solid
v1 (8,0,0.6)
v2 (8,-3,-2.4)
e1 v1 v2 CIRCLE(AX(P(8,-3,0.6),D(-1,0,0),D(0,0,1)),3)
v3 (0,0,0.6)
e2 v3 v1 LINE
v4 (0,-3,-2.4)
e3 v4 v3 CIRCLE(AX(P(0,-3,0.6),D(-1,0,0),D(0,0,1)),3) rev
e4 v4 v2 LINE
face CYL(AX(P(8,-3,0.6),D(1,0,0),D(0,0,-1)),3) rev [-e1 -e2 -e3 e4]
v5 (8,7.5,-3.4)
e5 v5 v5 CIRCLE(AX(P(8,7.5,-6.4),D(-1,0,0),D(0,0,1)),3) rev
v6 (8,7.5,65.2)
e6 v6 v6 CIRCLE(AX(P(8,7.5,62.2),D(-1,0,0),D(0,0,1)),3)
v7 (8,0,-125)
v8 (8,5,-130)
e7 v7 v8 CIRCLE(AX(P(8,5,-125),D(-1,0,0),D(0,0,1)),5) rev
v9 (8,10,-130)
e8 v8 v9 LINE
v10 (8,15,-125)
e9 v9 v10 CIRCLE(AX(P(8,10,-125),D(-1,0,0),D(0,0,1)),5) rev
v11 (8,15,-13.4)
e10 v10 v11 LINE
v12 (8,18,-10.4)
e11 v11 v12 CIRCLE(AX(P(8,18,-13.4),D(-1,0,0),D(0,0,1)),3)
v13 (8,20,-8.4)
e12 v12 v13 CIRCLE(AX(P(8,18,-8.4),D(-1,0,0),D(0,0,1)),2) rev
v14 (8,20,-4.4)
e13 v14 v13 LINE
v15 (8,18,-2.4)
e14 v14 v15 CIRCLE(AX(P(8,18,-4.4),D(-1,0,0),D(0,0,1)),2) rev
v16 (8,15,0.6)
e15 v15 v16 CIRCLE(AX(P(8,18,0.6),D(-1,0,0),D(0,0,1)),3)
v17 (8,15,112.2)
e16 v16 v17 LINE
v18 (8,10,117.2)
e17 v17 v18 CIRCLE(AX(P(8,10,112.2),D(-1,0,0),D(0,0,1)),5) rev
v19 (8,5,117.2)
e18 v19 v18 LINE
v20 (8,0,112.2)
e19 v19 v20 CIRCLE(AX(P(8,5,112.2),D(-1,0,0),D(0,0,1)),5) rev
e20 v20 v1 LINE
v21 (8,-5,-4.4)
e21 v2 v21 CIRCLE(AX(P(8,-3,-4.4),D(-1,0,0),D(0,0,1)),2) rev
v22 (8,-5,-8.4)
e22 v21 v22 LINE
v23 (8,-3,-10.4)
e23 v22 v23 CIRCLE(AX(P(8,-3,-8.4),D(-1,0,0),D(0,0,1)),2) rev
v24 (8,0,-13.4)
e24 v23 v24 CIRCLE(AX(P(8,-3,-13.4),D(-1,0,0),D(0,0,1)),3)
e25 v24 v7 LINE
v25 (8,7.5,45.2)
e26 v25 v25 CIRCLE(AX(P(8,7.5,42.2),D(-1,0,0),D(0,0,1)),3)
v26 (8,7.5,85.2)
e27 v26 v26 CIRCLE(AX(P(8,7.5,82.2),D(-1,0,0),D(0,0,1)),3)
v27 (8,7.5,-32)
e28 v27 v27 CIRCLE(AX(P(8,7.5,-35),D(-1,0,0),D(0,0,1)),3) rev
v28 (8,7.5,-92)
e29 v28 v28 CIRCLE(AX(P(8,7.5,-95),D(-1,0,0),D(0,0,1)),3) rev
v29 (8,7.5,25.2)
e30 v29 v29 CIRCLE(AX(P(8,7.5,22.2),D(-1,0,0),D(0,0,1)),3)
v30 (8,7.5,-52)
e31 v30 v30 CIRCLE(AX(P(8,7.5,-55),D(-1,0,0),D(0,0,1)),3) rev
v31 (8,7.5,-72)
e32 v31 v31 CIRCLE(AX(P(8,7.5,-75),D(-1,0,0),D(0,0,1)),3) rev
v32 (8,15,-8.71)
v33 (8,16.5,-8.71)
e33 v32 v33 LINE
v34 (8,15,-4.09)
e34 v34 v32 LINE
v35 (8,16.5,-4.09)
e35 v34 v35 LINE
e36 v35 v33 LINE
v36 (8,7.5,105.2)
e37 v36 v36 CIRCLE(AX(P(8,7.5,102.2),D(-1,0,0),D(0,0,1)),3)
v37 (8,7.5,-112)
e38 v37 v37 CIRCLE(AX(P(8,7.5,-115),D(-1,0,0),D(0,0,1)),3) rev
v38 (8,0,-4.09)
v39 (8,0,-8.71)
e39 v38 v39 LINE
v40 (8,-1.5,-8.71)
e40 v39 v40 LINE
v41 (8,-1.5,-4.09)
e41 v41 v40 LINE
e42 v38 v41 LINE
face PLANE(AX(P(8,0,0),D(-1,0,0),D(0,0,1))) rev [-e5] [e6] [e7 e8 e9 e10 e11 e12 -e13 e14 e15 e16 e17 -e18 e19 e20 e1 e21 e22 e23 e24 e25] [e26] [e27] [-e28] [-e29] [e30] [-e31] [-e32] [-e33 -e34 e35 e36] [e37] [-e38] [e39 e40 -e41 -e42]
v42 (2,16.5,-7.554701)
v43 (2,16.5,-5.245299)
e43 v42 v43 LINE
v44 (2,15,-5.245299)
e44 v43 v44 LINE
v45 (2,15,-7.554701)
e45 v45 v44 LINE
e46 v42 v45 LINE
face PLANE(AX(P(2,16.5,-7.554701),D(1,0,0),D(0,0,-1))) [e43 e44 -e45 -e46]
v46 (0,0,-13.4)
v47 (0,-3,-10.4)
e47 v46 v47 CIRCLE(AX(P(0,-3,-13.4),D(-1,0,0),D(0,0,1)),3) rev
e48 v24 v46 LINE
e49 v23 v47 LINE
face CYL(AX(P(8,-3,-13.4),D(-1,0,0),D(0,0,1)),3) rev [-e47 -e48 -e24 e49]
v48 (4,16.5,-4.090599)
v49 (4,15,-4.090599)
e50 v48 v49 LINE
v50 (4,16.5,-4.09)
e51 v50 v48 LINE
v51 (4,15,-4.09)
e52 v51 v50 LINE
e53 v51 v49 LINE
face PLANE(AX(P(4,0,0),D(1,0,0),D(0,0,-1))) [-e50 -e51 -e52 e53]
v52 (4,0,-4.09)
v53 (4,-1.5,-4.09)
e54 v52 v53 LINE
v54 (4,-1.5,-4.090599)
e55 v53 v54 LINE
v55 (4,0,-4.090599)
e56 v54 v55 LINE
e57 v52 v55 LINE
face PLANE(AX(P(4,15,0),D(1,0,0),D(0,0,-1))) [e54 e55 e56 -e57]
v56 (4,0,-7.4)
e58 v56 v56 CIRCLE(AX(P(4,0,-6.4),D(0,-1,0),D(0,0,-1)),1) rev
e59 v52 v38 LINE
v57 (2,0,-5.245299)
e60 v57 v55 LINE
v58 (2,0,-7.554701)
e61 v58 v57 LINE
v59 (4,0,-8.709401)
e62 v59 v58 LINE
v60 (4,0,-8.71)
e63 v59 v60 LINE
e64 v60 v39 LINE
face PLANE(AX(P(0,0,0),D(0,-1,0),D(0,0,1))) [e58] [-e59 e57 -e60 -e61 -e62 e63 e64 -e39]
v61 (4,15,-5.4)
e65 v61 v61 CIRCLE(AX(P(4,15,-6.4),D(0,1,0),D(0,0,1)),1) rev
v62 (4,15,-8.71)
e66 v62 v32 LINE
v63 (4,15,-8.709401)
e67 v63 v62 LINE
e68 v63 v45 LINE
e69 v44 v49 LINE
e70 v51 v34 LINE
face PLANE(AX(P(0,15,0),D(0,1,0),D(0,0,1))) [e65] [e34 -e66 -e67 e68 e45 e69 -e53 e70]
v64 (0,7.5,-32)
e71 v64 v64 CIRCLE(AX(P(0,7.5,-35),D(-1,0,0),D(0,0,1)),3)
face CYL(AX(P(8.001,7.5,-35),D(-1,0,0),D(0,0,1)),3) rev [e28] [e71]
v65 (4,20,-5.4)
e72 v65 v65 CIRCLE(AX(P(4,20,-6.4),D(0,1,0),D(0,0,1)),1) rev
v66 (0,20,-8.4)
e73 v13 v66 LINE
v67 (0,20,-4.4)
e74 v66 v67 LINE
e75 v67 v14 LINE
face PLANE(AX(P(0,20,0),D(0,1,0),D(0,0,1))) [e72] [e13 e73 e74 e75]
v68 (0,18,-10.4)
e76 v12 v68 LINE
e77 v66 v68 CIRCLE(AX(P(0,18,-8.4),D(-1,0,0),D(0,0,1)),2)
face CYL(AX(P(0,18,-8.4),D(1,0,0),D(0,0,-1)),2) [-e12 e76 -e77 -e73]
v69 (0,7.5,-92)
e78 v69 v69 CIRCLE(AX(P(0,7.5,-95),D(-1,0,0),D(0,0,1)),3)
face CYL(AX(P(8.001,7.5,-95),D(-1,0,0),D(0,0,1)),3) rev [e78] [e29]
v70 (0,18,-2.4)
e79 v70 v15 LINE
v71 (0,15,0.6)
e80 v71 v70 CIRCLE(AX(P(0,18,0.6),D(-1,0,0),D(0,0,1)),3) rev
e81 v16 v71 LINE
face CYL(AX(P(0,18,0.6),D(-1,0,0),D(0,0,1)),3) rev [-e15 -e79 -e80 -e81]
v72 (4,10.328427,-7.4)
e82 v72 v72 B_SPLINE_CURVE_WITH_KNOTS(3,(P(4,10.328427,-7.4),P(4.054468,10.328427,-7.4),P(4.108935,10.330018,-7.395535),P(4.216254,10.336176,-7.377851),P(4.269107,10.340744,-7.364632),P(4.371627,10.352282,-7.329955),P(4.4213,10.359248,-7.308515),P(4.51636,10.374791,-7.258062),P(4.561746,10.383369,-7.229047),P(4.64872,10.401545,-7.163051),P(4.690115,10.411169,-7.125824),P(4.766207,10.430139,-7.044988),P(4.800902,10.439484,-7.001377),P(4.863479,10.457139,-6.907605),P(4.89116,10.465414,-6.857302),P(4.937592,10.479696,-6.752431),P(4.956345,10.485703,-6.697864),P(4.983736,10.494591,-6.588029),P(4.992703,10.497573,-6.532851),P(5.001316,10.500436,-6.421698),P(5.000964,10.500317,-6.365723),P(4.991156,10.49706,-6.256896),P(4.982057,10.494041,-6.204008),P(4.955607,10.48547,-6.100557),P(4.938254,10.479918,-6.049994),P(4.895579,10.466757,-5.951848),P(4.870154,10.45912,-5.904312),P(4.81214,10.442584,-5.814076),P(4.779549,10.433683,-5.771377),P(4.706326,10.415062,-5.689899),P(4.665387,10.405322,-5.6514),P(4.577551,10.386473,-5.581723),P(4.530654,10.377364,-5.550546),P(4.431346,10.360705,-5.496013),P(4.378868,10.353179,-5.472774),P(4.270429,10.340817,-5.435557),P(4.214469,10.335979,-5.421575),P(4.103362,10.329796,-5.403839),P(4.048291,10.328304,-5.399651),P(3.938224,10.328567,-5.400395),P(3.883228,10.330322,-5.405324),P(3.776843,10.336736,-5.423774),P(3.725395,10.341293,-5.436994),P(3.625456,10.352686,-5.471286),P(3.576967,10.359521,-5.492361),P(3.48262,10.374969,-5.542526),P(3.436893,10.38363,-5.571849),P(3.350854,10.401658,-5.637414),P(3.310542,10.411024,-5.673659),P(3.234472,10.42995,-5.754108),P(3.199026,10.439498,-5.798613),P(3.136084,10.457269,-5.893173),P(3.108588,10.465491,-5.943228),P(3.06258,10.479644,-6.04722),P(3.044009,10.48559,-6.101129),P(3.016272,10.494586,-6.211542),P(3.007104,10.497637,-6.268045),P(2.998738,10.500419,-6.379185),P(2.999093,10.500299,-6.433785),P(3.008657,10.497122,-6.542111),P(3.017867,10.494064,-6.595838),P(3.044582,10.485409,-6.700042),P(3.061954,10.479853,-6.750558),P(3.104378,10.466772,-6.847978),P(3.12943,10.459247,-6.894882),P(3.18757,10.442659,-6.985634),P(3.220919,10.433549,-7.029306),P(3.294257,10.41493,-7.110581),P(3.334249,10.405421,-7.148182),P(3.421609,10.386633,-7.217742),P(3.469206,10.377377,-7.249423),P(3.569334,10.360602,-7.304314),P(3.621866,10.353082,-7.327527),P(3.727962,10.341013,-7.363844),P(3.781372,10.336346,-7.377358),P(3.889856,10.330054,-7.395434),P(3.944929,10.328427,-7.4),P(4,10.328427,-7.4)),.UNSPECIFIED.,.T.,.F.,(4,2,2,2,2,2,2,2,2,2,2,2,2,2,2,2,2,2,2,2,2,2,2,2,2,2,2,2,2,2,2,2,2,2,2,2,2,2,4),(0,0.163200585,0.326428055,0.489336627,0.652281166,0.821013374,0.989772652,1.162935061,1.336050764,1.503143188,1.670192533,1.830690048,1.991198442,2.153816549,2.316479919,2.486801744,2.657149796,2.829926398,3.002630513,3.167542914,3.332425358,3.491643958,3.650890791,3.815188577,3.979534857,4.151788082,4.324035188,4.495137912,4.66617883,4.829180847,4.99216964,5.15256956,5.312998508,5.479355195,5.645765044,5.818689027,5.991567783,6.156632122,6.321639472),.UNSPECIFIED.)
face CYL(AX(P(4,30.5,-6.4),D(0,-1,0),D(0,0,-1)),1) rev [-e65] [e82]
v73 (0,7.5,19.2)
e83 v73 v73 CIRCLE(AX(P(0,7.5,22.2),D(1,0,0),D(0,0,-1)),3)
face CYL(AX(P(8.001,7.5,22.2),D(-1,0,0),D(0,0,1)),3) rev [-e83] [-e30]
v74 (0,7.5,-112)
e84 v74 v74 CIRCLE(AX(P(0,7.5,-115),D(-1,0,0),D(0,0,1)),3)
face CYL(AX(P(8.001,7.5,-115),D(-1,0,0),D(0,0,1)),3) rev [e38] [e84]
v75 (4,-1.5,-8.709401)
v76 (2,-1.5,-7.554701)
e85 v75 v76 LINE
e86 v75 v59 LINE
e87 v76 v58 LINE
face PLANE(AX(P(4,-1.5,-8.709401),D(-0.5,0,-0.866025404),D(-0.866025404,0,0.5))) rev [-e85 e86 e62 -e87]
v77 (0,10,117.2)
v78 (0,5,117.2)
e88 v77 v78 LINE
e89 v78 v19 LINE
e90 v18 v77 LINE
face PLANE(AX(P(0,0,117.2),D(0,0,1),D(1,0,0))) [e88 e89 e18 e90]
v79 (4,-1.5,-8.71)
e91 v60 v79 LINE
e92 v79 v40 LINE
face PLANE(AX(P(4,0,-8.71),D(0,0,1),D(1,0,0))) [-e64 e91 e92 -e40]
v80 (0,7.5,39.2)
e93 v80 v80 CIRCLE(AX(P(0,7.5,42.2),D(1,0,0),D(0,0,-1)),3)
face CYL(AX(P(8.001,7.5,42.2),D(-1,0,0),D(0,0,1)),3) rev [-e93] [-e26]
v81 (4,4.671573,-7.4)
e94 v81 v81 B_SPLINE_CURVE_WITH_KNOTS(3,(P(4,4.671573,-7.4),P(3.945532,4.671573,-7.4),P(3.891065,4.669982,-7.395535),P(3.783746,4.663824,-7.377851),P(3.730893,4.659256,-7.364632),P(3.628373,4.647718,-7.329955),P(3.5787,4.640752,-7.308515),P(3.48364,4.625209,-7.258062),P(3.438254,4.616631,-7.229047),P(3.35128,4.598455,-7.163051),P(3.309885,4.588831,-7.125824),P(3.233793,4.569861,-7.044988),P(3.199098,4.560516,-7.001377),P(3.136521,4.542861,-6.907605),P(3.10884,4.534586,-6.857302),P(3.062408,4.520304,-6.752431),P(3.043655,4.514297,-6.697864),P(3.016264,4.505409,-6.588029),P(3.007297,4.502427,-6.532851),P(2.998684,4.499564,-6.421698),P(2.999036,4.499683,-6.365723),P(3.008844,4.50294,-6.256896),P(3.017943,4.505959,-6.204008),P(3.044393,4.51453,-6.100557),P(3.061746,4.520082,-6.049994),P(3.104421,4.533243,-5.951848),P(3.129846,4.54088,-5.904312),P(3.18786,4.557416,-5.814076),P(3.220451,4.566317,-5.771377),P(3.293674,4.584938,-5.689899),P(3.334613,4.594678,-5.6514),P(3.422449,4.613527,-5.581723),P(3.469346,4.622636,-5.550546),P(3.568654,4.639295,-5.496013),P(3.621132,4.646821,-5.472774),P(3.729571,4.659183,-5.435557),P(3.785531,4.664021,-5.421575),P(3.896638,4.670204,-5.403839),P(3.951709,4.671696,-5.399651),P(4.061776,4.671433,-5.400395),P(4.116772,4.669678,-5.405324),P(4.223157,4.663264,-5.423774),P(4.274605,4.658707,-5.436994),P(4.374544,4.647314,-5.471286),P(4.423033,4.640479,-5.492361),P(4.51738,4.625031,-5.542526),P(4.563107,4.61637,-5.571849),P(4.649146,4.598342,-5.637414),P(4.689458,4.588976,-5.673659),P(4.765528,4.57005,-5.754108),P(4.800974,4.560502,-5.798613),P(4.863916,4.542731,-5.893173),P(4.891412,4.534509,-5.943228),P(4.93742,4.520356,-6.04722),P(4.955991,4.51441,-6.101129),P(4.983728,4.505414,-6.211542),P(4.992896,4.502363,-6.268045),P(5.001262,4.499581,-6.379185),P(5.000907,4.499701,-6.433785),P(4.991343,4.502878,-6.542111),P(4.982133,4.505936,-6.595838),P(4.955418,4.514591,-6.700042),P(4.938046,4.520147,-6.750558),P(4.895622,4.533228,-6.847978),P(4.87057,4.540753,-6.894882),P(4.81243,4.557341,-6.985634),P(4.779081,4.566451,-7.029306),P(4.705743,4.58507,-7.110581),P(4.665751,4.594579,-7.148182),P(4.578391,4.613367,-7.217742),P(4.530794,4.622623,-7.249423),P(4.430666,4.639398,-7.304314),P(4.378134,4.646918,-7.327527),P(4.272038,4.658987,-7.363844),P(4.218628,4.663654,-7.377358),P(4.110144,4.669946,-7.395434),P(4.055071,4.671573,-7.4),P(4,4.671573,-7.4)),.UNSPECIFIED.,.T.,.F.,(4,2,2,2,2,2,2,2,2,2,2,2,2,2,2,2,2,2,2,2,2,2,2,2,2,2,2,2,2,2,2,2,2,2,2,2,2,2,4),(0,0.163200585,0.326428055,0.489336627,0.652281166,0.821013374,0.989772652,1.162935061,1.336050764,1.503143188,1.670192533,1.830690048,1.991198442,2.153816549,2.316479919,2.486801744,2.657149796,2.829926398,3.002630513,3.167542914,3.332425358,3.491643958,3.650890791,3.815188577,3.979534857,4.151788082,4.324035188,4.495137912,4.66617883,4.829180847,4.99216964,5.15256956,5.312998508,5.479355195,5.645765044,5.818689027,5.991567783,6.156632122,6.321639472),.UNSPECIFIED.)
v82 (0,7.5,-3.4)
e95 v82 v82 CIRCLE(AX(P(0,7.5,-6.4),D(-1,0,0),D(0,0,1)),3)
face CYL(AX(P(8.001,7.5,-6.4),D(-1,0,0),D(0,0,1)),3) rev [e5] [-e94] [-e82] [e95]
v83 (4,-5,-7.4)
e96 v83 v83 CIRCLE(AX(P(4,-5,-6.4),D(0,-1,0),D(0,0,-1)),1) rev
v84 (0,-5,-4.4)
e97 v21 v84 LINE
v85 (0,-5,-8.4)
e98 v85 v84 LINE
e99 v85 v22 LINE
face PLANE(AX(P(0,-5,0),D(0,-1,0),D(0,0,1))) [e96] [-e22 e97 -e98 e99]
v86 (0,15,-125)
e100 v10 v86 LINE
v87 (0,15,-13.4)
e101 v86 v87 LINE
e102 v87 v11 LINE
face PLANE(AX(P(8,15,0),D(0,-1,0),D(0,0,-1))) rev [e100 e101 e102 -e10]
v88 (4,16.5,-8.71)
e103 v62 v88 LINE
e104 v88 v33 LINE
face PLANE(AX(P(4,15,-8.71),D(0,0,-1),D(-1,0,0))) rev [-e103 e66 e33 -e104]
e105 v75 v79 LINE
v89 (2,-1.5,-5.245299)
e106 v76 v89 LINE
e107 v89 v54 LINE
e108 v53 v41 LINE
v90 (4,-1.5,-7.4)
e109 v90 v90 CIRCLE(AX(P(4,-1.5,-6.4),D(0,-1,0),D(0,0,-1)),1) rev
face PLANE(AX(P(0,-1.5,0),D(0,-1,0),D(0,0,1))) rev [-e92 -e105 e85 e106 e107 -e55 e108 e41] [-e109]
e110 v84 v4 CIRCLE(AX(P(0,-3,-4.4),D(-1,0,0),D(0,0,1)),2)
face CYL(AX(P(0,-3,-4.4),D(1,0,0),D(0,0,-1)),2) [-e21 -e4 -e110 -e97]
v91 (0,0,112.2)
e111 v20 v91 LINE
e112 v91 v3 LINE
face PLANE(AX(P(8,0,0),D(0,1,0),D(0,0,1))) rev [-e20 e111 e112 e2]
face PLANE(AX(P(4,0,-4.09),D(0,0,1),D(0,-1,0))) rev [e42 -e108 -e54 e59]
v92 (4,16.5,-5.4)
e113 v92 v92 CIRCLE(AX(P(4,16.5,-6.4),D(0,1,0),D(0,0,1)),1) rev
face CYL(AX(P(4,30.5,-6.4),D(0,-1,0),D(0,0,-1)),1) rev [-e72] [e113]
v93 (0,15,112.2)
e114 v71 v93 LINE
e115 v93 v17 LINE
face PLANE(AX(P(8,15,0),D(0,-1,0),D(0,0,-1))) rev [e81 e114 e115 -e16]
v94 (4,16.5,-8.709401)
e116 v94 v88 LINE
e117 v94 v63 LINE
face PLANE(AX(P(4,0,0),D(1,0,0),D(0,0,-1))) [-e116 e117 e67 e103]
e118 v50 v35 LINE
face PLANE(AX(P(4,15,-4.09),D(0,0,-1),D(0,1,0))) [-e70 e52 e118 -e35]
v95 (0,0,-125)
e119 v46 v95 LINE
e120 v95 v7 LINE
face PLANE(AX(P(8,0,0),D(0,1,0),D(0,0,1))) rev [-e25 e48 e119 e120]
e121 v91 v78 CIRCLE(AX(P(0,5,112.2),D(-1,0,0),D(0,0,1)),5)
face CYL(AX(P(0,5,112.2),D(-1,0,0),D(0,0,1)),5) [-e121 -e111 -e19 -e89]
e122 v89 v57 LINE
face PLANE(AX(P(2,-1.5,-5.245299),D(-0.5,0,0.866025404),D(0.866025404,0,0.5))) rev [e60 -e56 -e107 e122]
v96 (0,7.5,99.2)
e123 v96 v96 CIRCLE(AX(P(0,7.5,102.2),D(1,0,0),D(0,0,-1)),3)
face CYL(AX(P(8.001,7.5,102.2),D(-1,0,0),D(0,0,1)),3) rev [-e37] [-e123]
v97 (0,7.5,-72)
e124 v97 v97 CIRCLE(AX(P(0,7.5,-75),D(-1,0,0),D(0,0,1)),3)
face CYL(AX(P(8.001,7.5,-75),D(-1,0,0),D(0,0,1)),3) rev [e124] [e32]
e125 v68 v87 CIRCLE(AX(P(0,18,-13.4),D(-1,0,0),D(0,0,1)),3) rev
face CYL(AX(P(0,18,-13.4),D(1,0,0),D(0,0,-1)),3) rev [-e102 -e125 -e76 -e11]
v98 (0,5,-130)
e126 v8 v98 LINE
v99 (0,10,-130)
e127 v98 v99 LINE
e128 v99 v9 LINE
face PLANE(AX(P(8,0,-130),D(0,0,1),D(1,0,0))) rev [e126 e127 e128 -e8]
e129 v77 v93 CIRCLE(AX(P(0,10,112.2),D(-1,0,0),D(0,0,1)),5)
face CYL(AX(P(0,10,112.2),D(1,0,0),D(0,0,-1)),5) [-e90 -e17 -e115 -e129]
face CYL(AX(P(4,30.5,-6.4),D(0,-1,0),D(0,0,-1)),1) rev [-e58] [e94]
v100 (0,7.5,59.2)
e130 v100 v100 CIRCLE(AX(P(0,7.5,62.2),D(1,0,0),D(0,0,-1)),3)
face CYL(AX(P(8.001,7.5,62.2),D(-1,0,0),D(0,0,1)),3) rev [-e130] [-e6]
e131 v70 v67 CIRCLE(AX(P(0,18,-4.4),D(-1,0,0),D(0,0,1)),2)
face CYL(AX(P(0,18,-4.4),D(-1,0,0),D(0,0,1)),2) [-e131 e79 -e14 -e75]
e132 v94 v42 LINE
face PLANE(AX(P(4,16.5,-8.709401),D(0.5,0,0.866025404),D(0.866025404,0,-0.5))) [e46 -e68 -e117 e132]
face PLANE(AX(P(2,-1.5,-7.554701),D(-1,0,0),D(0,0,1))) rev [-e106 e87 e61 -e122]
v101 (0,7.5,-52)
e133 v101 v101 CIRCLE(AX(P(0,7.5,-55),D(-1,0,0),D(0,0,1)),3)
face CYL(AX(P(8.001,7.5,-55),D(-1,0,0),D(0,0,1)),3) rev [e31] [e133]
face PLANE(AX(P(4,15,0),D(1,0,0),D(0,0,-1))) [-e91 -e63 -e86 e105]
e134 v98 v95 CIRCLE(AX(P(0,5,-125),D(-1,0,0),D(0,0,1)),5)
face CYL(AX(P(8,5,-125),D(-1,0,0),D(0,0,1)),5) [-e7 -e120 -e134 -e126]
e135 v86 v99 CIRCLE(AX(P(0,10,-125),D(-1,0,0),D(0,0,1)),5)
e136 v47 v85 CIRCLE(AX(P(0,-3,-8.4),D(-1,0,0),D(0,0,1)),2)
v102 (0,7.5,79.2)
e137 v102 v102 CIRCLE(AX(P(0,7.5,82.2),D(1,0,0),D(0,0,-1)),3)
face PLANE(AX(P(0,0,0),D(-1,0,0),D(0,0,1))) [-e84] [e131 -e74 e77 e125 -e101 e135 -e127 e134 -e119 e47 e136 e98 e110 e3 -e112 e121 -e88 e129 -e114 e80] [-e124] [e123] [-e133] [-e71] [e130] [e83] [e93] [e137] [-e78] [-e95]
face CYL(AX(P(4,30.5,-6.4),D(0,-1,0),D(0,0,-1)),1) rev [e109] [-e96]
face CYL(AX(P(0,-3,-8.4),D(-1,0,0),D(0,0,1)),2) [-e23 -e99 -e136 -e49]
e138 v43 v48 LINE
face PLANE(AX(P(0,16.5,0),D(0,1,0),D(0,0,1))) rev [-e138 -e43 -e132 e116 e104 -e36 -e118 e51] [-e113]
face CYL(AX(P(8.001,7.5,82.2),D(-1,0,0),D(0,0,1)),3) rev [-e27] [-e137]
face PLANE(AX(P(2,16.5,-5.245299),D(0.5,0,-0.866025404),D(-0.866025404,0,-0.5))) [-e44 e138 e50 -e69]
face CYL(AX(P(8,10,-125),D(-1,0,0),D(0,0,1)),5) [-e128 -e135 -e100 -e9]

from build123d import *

# Parameters (mm, degrees)
SKETCH_1_W                = 130
SKETCH_1_H                = 15
EXTRUDE_1_DEPTH           = 8
CUT_EXTRUDE_10_REACH      = 133.107
SKETCH_17_R               = 3
SKETCH_19_W               = 8
SKETCH_19_H               = 15
EXTRUDE_6_DEPTH           = 117.2
FILLET_1_R                = 5
CUT_EXTRUDE_12_REACH      = 133.107
SKETCH_15_R               = 3
SKETCH_22_W               = 8
SKETCH_22_H               = 8
EXTRUDE_7_DEPTH           = 5
CUT_EXTRUDE_18_DEPTH      = 1.5
SKETCH_25_W               = 4.62
SKETCH_25_H               = 1.5
CUT_EXTRUDE_19_DEPTH      = 4
FILLET_8_R                = 3
FILLET_9_R                = 2
FILLET_10_R               = 2
FILLET_11_R               = 3
CUT_EXTRUDE_20_DEPTH      = 15.5
CUT_EXTRUDE_20_DEPTH_BACK = 28.5
SKETCH_21_R               = 1


with BuildPart() as part:
    # 草图1 → 凸台-拉伸1 (new body)
    with BuildSketch(Plane(origin=(0, 0, 0), x_dir=(0, 0, -1), z_dir=(1, 0, 0))):
        with Locations((65, 7.5)):
            Rectangle(SKETCH_1_W, SKETCH_1_H)
    extrude(amount=EXTRUDE_1_DEPTH)

    # 草图17 → 切除-拉伸10 (cut, up to next)
    with BuildSketch(Plane.ZY, mode=Mode.PRIVATE) as cut_extrude_10_sk1:
        with Locations((-115, 7.5)):
            Circle(SKETCH_17_R)
    cut_extrude_10_tool1 = extrude(cut_extrude_10_sk1.sketch, amount=-CUT_EXTRUDE_10_REACH, mode=Mode.PRIVATE) & part.part
    # 草图17 → 切除-拉伸10 (cut, up to next)
    with BuildSketch(Plane.ZY, mode=Mode.PRIVATE) as cut_extrude_10_sk2:
        with Locations((-95, 7.5)):
            Circle(SKETCH_17_R)
    cut_extrude_10_tool2 = extrude(cut_extrude_10_sk2.sketch, amount=-CUT_EXTRUDE_10_REACH, mode=Mode.PRIVATE) & part.part
    # 草图17 → 切除-拉伸10 (cut, up to next)
    with BuildSketch(Plane.ZY, mode=Mode.PRIVATE) as cut_extrude_10_sk3:
        with Locations((-75, 7.5)):
            Circle(SKETCH_17_R)
    cut_extrude_10_tool3 = extrude(cut_extrude_10_sk3.sketch, amount=-CUT_EXTRUDE_10_REACH, mode=Mode.PRIVATE) & part.part
    # 草图17 → 切除-拉伸10 (cut, up to next)
    with BuildSketch(Plane.ZY, mode=Mode.PRIVATE) as cut_extrude_10_sk4:
        with Locations((-55, 7.5)):
            Circle(SKETCH_17_R)
    cut_extrude_10_tool4 = extrude(cut_extrude_10_sk4.sketch, amount=-CUT_EXTRUDE_10_REACH, mode=Mode.PRIVATE) & part.part
    # 草图17 → 切除-拉伸10 (cut, up to next)
    with BuildSketch(Plane.ZY, mode=Mode.PRIVATE) as cut_extrude_10_sk5:
        with Locations((-35, 7.5)):
            Circle(SKETCH_17_R)
    cut_extrude_10_tool5 = extrude(cut_extrude_10_sk5.sketch, amount=-CUT_EXTRUDE_10_REACH, mode=Mode.PRIVATE) & part.part
    cut_extrude_10_1 = cut_extrude_10_tool1.solids().sort_by_distance((0, 7.5, -115))[0]
    add(cut_extrude_10_1, mode=Mode.SUBTRACT)
    cut_extrude_10_2 = cut_extrude_10_tool2.solids().sort_by_distance((0, 7.5, -95))[0]
    add(cut_extrude_10_2, mode=Mode.SUBTRACT)
    cut_extrude_10_3 = cut_extrude_10_tool3.solids().sort_by_distance((0, 7.5, -75))[0]
    add(cut_extrude_10_3, mode=Mode.SUBTRACT)
    cut_extrude_10_4 = cut_extrude_10_tool4.solids().sort_by_distance((0, 7.5, -55))[0]
    add(cut_extrude_10_4, mode=Mode.SUBTRACT)
    cut_extrude_10_5 = cut_extrude_10_tool5.solids().sort_by_distance((0, 7.5, -35))[0]
    add(cut_extrude_10_5, mode=Mode.SUBTRACT)
    cut_extrude_10 = cut_extrude_10_1 + cut_extrude_10_2 + cut_extrude_10_3 + cut_extrude_10_4 + cut_extrude_10_5  # 切除-拉伸10 as one shape, for the pattern or mirror that repeats it

    # 草图19 → 凸台-拉伸6 (add)
    with BuildSketch(Plane.XY):
        with Locations((4, 7.5)):
            Rectangle(SKETCH_19_W, SKETCH_19_H)
    extrude(amount=EXTRUDE_6_DEPTH)

    # 镜向1: 切除-拉伸10 across plane
    add(cut_extrude_10.mirror(Plane.XY.offset(-6.4)), mode=Mode.SUBTRACT)

    # 圆角1
    fillet_1_edges = [part.edges().sort_by_distance(p)[0] for p in [
        (4, 0, 117.2),
        (4, 15, 117.2),
        (4, 15, -130),
        (4, 0, -130),
    ]]
    fillet(fillet_1_edges, radius=FILLET_1_R)

    # 草图15 → 切除-拉伸12 (cut, up to next)
    with BuildSketch(Plane.ZY, mode=Mode.PRIVATE) as cut_extrude_12_sk1:
        with Locations((-6.4, 7.5)):
            Circle(SKETCH_15_R)
    cut_extrude_12_tool1 = extrude(cut_extrude_12_sk1.sketch, amount=-CUT_EXTRUDE_12_REACH, mode=Mode.PRIVATE) & part.part
    add(cut_extrude_12_tool1.solids().sort_by_distance((0, 7.5, -6.4))[0], mode=Mode.SUBTRACT)

    # 草图22 → 凸台-拉伸7 (add)
    with BuildSketch(Plane(origin=(0, 15, 0), x_dir=(1, 0, 0), z_dir=(0, 1, 0))):
        with Locations((4, 6.4)):
            Rectangle(SKETCH_22_W, SKETCH_22_H)
    extrude_7 = extrude(amount=EXTRUDE_7_DEPTH)

    # 草图24 → 切除-拉伸18 (cut)
    with BuildSketch(Plane(origin=(0, 15, 0), x_dir=(1, 0, 0), z_dir=(0, 1, 0))):
        Polygon((4, 4.090598923), (6, 5.245299462), (6, 7.554700538), (4, 8.709401077), (2, 7.554700538), (2, 5.245299462), align=None)
    cut_extrude_18 = extrude(amount=CUT_EXTRUDE_18_DEPTH, mode=Mode.SUBTRACT)

    # 草图25 → 切除-拉伸19 (cut)
    with BuildSketch(Plane(origin=(8, 0, 0), x_dir=(0, 0, -1), z_dir=(1, 0, 0))):
        with Locations((6.4, 15.75)):
            Rectangle(SKETCH_25_W, SKETCH_25_H)
    cut_extrude_19 = extrude(amount=-CUT_EXTRUDE_19_DEPTH, mode=Mode.SUBTRACT)

    # 圆角8
    fillet_8_edges = [part.edges().sort_by_distance(p)[0] for p in [
        (4, 15, -2.4),
        (4, 15, -10.4),
    ]]
    fillet(fillet_8_edges, radius=FILLET_8_R)

    # 圆角9
    fillet_9_edges = [part.edges().sort_by_distance(p)[0] for p in [
        (4, 20, -2.4),
        (4, 20, -10.4),
    ]]
    fillet(fillet_9_edges, radius=FILLET_9_R - 0.0001)  # a hair under: the kernel refuses the full size

    # 镜向6: 凸台-拉伸7, 切除-拉伸18, 切除-拉伸19 across plane
    add(extrude_7.mirror(Plane.ZX.offset(7.5)))
    add(cut_extrude_18.mirror(Plane.ZX.offset(7.5)), mode=Mode.SUBTRACT)
    add(cut_extrude_19.mirror(Plane.ZX.offset(7.5)), mode=Mode.SUBTRACT)

    # 圆角10
    fillet_10_edges = [part.edges().sort_by_distance(p)[0] for p in [
        (4, -5, -10.4),
        (4, -5, -2.4),
    ]]
    fillet(fillet_10_edges, radius=FILLET_10_R)

    # 圆角11
    fillet_11_edges = [part.edges().sort_by_distance(p)[0] for p in [
        (4, 0, -2.4),
        (4, 0, -10.4),
    ]]
    fillet(fillet_11_edges, radius=FILLET_11_R - 0.0001)  # a hair under: the kernel refuses the full size

    # 草图21 → 切除-拉伸20 (cut, two sides: drawn at the far end of the back side and taken through both)
    with BuildSketch(Plane(origin=(0, 15, 0), x_dir=(1, 0, 0), z_dir=(0, 1, 0)).offset(-CUT_EXTRUDE_20_DEPTH_BACK)):
        with Locations(Location((4, 6.4, 0), (0, 0, 90))):
            Circle(SKETCH_21_R)
    extrude(amount=CUT_EXTRUDE_20_DEPTH + CUT_EXTRUDE_20_DEPTH_BACK, mode=Mode.SUBTRACT)


solid = part.part
